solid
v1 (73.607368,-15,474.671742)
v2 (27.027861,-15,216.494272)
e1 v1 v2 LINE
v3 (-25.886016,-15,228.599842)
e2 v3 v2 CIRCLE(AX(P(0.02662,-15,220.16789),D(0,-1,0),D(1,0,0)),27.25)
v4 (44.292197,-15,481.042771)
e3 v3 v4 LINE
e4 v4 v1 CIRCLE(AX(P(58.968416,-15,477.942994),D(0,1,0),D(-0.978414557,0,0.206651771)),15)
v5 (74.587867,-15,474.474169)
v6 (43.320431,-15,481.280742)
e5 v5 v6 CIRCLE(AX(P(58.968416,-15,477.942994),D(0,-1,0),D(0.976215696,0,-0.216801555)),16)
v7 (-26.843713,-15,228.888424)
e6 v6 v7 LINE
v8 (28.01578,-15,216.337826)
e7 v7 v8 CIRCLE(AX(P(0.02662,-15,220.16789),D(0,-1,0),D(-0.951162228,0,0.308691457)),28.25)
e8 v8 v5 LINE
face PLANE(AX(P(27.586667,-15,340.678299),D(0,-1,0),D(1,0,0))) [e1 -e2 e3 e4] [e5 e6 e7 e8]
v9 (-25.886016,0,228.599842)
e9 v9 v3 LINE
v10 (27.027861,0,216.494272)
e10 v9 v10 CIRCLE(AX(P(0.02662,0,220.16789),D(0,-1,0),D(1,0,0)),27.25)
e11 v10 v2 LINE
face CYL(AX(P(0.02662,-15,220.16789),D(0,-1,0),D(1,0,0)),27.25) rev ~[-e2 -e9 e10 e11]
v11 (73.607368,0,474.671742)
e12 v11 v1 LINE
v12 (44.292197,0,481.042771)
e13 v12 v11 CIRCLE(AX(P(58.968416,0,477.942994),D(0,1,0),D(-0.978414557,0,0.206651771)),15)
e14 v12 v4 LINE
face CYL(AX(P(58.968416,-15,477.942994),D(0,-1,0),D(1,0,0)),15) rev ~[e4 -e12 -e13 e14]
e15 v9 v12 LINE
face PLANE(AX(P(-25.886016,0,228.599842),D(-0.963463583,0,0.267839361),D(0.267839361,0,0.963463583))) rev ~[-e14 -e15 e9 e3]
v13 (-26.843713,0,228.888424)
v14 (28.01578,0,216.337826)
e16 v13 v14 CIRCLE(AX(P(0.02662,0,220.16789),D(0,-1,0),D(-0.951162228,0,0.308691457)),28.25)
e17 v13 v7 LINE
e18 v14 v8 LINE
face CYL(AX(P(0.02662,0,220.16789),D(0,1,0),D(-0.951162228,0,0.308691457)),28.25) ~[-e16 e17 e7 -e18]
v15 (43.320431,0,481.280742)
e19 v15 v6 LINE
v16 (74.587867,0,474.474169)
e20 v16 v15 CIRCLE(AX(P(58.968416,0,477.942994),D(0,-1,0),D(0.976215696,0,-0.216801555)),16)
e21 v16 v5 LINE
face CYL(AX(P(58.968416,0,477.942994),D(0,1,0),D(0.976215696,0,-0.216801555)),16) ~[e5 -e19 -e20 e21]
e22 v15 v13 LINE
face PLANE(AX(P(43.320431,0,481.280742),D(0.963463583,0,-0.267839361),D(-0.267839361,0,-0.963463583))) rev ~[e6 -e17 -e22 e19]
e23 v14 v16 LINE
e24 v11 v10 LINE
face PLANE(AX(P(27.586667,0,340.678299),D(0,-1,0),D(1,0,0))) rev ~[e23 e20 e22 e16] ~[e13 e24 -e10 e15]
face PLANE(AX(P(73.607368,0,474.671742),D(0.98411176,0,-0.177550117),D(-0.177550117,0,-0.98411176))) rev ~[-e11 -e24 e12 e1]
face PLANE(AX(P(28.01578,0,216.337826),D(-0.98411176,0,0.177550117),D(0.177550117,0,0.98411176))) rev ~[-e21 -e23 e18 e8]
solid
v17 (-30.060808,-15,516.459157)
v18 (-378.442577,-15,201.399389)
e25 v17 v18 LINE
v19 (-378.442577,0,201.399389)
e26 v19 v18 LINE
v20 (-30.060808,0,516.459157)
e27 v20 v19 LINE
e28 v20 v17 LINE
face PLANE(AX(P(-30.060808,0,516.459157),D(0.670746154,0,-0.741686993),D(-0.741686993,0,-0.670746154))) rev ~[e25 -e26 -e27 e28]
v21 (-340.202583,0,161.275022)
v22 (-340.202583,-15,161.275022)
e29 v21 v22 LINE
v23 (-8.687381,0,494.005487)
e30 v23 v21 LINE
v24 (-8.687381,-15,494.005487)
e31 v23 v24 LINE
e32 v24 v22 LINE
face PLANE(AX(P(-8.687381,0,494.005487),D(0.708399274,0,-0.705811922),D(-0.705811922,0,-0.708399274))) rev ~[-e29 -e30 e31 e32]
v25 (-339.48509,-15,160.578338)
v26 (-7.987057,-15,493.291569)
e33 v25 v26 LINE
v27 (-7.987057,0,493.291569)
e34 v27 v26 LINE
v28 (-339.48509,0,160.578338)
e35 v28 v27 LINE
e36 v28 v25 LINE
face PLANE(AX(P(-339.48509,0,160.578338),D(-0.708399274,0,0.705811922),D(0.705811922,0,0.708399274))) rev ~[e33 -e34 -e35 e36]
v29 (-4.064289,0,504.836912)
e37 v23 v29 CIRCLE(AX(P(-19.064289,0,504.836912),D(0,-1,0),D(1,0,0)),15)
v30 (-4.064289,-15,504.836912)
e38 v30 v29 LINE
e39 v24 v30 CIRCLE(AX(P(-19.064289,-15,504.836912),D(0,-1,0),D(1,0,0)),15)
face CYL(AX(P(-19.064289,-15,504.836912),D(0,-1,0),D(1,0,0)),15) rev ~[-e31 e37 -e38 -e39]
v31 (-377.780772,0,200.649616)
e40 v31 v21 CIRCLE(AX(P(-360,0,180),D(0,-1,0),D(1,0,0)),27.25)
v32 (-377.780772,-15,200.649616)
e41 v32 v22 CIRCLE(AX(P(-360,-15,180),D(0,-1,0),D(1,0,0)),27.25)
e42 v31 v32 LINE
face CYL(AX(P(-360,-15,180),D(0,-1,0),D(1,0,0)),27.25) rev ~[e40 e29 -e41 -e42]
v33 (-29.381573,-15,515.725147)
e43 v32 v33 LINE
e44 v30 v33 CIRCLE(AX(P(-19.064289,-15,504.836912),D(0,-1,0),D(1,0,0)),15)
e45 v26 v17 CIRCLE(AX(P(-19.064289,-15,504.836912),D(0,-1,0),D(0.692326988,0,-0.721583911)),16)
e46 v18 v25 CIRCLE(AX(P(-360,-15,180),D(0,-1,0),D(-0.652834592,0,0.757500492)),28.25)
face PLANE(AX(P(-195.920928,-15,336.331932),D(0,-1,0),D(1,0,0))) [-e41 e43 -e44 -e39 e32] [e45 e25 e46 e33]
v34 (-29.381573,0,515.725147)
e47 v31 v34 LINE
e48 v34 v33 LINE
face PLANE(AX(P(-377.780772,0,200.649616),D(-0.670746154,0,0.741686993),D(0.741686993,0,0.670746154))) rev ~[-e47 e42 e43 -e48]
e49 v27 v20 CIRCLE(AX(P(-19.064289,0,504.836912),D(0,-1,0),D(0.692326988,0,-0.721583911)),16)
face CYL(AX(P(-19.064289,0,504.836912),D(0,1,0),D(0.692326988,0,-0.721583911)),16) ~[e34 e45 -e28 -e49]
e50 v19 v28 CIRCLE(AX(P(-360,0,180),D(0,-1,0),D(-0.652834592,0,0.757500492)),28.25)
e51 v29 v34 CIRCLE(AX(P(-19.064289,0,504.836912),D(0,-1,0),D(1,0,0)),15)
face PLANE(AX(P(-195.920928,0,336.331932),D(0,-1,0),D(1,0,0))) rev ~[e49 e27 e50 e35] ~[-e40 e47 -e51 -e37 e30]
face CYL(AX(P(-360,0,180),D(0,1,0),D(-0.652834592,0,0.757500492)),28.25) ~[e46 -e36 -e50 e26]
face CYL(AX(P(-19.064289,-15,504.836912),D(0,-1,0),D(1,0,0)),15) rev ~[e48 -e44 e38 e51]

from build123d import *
from build123d import SkipClean  # not in build123d's __all__

# Parameters (mm, degrees)
F1_DEPTH  = 15
F2_R      = 8
F2_R_2    = 3
F3_DEPTH  = 10
F4_R      = 8
F4_R_2    = 3
F5_DEPTH  = 10
F6_R      = 8
F6_R_2    = 3
F7_DEPTH  = 10
F8_R      = 27.25
F8_R_2    = 15
F9_DEPTH  = 20
F11_R     = 15
F11_R_2   = 27.25
F12_DEPTH = 20


with BuildPart() as f1:
    # F0 (on Front) → F1 (new body)
    with BuildSketch(Plane.XZ):
        with BuildLine():
            ThreePointArc((-378.4425772317, 201.3993888944), (-386.4820244342, 170.1630857548), (-360, 151.75))
            ThreePointArc((-360, 151.75), (-348.8330724465, 154.0507759458), (-339.4850899056, 160.5783377689))
            Line((-339.4850899056, 160.5783377689), (-7.9870573254, 493.2915694615))
            ThreePointArc((-7.9870573254, 493.2915694615), (-7.480425283, 515.8738544687), (-30.0608082206, 516.4591565815))
            Line((-30.0608082206, 516.4591565815), (-378.4425772317, 201.3993888944))
        make_face()
        with BuildLine():
            ThreePointArc((-342.5, 180), (-347.6256313292, 167.6256313292), (-360, 162.5))
            ThreePointArc((-360, 162.5), (-376.0857600208, 186.8919028253), (-347.3301148646, 192.071620051))
            ThreePointArc((-347.3301148646, 192.071620051), (-343.7523387857, 186.5010387682), (-342.5, 180))
        make_face(mode=Mode.SUBTRACT)
        with BuildLine():
            ThreePointArc((-340.2025834833, 161.275022049), (-332.7500455353, 180.0498163798), (-340.2711788606, 198.7972369366))
            ThreePointArc((-340.2711788606, 198.7972369366), (-358.6559201587, 207.2168320967), (-377.7807722421, 200.6496159401))
            Line((-377.7807722421, 200.6496159401), (-29.3815729723, 515.7251467174))
            ThreePointArc((-29.3815729723, 515.7251467174), (-34.059394529, 505.2200757083), (-29.9241906854, 494.4898091415))
            ThreePointArc((-29.9241906854, 494.4898091415), (-19.406287314, 489.8408113075), (-8.6873810185, 494.0054865673))
            Line((-8.6873810185, 494.0054865673), (-340.2025834833, 161.275022049))
        make_face(mode=Mode.SUBTRACT)
        with BuildLine():
            ThreePointArc((-16.0642891408, 504.8369120424), (-17.949825352, 502.0515986913), (-21.2362694497, 502.7674914622))
            ThreePointArc((-21.2362694497, 502.7674914622), (-20.1787529296, 507.6222253934), (-16.0642891408, 504.8369120424))
        make_face(mode=Mode.SUBTRACT)
    extrude(amount=F1_DEPTH)

    # F4 (on face) → F5 (join)
    with BuildSketch(Plane.XZ.offset(15)):
        with Locations((-19.0642891408, 504.8369120424)):
            Circle(F4_R)
        with Locations((-19.0642891408, 504.8369120424)):
            Circle(F4_R_2, mode=Mode.SUBTRACT)
    extrude(amount=F5_DEPTH)

    # F11 (on face) → F12 (cut, symmetric)
    with BuildSketch(Plane.XZ.offset(15)):
        with Locations((-19.0642891408, 504.8369120424)):
            Circle(F11_R)
        with Locations((-360, 180)):
            Circle(F11_R_2)
    with SkipClean():  # cleaning this boolean's faces spoils the solid; the shape is the same uncleaned
        extrude(amount=F12_DEPTH, both=True, mode=Mode.SUBTRACT)


with BuildPart() as f1b:
    # F0 (on Front) → F1, piece 2 (new body)
    with BuildSketch(Plane.XZ):
        with BuildLine():
            ThreePointArc((-224.660632779, 532.8994691874), (-247.0029596883, 497.3937658802), (-209.3929270309, 478.8109786144))
            Line((-209.3929270309, 478.8109786144), (4.2800251225, 551.6775062268))
            ThreePointArc((4.2800251225, 551.6775062268), (15.2214539509, 571.3907533569), (-4.4127934903, 582.4733209582))
            Line((-4.4127934903, 582.4733209582), (-224.660632779, 532.8994691874))
        make_face()
        with BuildLine():
            ThreePointArc((-202.3153298886, 505.0680922919), (-237.1501331245, 502.669218229), (-202.9729980908, 509.8205505625))
            ThreePointArc((-202.9729980908, 509.8205505625), (-202.4805266526, 507.4669663547), (-202.3153298886, 505.0680922919))
        make_face(mode=Mode.SUBTRACT)
        with BuildLine():
            ThreePointArc((-4.1701281966, 581.5029225476), (-13.2448658651, 574.4081273865), (-14.6131340506, 562.9706965429))
            ThreePointArc((-14.6131340506, 562.9706965429), (-7.4667919525, 553.9348179807), (3.9795568505, 552.6315889697))
            Line((3.9795568505, 552.6315889697), (-209.7391973494, 479.7494419911))
            ThreePointArc((-209.7391973494, 479.7494419911), (-195.37987596, 493.0069525734), (-193.589413232, 512.4683487418))
            ThreePointArc((-193.589413232, 512.4683487418), (-205.2909288271, 528.1246374322), (-224.4651790674, 531.9184442936))
            Line((-224.4651790674, 531.9184442936), (-4.1701281966, 581.5029225476))
        make_face(mode=Mode.SUBTRACT)
        with BuildLine():
            ThreePointArc((2.8231503475, 567.0442322034), (0.2343859011, 564.0725516487), (-3.0641065321, 566.2295250713))
            ThreePointArc((-3.0641065321, 566.2295250713), (-0.5880852061, 570.0159127581), (2.8231503475, 567.0442322034))
        make_face(mode=Mode.SUBTRACT)
    extrude(amount=F1_DEPTH)

    # F6 (on face) → F7 (join)
    with BuildSketch(Plane.XZ.offset(15)):
        with Locations((-0.1768496525, 567.0442322034)):
            Circle(F6_R)
        with Locations((-0.1768496525, 567.0442322034)):
            Circle(F6_R_2, mode=Mode.SUBTRACT)
    extrude(amount=F7_DEPTH)


with BuildPart() as f1c:
    # F0 (on Front) → F1, piece 3 (new body)
    with BuildSketch(Plane.XZ):
        with BuildLine():
            ThreePointArc((-26.8437130081, 228.8884241481), (-6.2735642109, 192.6293687538), (28.0157804914, 216.3378263061))
            Line((28.0157804914, 216.3378263061), (74.5878668874, 474.4741693703))
            ThreePointArc((74.5878668874, 474.4741693703), (62.3717320494, 493.5768497593), (43.3204306097, 481.2807421686))
            Line((43.3204306097, 481.2807421686), (-26.8437130081, 228.8884241481))
        make_face()
        with BuildLine():
            ThreePointArc((17.526619941, 220.1678904943), (-13.6575690894, 209.2595005773), (3.9274233032, 237.2276013104))
            ThreePointArc((3.9274233032, 237.2276013104), (13.7108089714, 231.0762804113), (17.526619941, 220.1678904943))
        make_face(mode=Mode.SUBTRACT)
        with BuildLine():
            ThreePointArc((44.2921973879, 481.0427708065), (46.331220076, 469.862073162), (55.6248700068, 463.3203849774))
            ThreePointArc((55.6248700068, 463.3203849774), (66.9752801691, 465.2587472424), (73.607367574, 474.6717422905))
            Line((73.607367574, 474.6717422905), (27.027861197, 216.4942723007))
            ThreePointArc((27.027861197, 216.4942723007), (22.4337443248, 235.6754137282), (6.1007280336, 246.7322973366))
            ThreePointArc((6.1007280336, 246.7322973366), (-13.4116938297, 243.8738860018), (-25.8860157877, 228.5998422013))
            Line((-25.8860157877, 228.5998422013), (44.2921973879, 481.0427708065))
        make_face(mode=Mode.SUBTRACT)
        with BuildLine():
            ThreePointArc((61.9684157458, 477.9429942484), (60.8384254459, 475.5971332717), (58.299706598, 475.0184723942))
            ThreePointArc((58.299706598, 475.0184723942), (57.0984060458, 480.288855225), (61.9684157458, 477.9429942484))
        make_face(mode=Mode.SUBTRACT)
    extrude(amount=F1_DEPTH)

    # F2 (on face) → F3 (join)
    with BuildSketch(Plane.XZ.offset(15)):
        with Locations((58.9684157458, 477.9429942484)):
            Circle(F2_R)
        with Locations((58.9684157458, 477.9429942484)):
            Circle(F2_R_2, mode=Mode.SUBTRACT)
    with SkipClean():  # cleaning this boolean's faces spoils the solid; the shape is the same uncleaned
        extrude(amount=F3_DEPTH)

    # F8 (on face) → F9 (cut, symmetric)
    with BuildSketch(Plane.XZ.offset(15)):
        with Locations((0.026619941, 220.1678904943)):
            Circle(F8_R)
        with Locations((58.9684157458, 477.9429942484)):
            Circle(F8_R_2)
    extrude(amount=F9_DEPTH, both=True, mode=Mode.SUBTRACT)


solid = Compound([f1.part, f1c.part])
